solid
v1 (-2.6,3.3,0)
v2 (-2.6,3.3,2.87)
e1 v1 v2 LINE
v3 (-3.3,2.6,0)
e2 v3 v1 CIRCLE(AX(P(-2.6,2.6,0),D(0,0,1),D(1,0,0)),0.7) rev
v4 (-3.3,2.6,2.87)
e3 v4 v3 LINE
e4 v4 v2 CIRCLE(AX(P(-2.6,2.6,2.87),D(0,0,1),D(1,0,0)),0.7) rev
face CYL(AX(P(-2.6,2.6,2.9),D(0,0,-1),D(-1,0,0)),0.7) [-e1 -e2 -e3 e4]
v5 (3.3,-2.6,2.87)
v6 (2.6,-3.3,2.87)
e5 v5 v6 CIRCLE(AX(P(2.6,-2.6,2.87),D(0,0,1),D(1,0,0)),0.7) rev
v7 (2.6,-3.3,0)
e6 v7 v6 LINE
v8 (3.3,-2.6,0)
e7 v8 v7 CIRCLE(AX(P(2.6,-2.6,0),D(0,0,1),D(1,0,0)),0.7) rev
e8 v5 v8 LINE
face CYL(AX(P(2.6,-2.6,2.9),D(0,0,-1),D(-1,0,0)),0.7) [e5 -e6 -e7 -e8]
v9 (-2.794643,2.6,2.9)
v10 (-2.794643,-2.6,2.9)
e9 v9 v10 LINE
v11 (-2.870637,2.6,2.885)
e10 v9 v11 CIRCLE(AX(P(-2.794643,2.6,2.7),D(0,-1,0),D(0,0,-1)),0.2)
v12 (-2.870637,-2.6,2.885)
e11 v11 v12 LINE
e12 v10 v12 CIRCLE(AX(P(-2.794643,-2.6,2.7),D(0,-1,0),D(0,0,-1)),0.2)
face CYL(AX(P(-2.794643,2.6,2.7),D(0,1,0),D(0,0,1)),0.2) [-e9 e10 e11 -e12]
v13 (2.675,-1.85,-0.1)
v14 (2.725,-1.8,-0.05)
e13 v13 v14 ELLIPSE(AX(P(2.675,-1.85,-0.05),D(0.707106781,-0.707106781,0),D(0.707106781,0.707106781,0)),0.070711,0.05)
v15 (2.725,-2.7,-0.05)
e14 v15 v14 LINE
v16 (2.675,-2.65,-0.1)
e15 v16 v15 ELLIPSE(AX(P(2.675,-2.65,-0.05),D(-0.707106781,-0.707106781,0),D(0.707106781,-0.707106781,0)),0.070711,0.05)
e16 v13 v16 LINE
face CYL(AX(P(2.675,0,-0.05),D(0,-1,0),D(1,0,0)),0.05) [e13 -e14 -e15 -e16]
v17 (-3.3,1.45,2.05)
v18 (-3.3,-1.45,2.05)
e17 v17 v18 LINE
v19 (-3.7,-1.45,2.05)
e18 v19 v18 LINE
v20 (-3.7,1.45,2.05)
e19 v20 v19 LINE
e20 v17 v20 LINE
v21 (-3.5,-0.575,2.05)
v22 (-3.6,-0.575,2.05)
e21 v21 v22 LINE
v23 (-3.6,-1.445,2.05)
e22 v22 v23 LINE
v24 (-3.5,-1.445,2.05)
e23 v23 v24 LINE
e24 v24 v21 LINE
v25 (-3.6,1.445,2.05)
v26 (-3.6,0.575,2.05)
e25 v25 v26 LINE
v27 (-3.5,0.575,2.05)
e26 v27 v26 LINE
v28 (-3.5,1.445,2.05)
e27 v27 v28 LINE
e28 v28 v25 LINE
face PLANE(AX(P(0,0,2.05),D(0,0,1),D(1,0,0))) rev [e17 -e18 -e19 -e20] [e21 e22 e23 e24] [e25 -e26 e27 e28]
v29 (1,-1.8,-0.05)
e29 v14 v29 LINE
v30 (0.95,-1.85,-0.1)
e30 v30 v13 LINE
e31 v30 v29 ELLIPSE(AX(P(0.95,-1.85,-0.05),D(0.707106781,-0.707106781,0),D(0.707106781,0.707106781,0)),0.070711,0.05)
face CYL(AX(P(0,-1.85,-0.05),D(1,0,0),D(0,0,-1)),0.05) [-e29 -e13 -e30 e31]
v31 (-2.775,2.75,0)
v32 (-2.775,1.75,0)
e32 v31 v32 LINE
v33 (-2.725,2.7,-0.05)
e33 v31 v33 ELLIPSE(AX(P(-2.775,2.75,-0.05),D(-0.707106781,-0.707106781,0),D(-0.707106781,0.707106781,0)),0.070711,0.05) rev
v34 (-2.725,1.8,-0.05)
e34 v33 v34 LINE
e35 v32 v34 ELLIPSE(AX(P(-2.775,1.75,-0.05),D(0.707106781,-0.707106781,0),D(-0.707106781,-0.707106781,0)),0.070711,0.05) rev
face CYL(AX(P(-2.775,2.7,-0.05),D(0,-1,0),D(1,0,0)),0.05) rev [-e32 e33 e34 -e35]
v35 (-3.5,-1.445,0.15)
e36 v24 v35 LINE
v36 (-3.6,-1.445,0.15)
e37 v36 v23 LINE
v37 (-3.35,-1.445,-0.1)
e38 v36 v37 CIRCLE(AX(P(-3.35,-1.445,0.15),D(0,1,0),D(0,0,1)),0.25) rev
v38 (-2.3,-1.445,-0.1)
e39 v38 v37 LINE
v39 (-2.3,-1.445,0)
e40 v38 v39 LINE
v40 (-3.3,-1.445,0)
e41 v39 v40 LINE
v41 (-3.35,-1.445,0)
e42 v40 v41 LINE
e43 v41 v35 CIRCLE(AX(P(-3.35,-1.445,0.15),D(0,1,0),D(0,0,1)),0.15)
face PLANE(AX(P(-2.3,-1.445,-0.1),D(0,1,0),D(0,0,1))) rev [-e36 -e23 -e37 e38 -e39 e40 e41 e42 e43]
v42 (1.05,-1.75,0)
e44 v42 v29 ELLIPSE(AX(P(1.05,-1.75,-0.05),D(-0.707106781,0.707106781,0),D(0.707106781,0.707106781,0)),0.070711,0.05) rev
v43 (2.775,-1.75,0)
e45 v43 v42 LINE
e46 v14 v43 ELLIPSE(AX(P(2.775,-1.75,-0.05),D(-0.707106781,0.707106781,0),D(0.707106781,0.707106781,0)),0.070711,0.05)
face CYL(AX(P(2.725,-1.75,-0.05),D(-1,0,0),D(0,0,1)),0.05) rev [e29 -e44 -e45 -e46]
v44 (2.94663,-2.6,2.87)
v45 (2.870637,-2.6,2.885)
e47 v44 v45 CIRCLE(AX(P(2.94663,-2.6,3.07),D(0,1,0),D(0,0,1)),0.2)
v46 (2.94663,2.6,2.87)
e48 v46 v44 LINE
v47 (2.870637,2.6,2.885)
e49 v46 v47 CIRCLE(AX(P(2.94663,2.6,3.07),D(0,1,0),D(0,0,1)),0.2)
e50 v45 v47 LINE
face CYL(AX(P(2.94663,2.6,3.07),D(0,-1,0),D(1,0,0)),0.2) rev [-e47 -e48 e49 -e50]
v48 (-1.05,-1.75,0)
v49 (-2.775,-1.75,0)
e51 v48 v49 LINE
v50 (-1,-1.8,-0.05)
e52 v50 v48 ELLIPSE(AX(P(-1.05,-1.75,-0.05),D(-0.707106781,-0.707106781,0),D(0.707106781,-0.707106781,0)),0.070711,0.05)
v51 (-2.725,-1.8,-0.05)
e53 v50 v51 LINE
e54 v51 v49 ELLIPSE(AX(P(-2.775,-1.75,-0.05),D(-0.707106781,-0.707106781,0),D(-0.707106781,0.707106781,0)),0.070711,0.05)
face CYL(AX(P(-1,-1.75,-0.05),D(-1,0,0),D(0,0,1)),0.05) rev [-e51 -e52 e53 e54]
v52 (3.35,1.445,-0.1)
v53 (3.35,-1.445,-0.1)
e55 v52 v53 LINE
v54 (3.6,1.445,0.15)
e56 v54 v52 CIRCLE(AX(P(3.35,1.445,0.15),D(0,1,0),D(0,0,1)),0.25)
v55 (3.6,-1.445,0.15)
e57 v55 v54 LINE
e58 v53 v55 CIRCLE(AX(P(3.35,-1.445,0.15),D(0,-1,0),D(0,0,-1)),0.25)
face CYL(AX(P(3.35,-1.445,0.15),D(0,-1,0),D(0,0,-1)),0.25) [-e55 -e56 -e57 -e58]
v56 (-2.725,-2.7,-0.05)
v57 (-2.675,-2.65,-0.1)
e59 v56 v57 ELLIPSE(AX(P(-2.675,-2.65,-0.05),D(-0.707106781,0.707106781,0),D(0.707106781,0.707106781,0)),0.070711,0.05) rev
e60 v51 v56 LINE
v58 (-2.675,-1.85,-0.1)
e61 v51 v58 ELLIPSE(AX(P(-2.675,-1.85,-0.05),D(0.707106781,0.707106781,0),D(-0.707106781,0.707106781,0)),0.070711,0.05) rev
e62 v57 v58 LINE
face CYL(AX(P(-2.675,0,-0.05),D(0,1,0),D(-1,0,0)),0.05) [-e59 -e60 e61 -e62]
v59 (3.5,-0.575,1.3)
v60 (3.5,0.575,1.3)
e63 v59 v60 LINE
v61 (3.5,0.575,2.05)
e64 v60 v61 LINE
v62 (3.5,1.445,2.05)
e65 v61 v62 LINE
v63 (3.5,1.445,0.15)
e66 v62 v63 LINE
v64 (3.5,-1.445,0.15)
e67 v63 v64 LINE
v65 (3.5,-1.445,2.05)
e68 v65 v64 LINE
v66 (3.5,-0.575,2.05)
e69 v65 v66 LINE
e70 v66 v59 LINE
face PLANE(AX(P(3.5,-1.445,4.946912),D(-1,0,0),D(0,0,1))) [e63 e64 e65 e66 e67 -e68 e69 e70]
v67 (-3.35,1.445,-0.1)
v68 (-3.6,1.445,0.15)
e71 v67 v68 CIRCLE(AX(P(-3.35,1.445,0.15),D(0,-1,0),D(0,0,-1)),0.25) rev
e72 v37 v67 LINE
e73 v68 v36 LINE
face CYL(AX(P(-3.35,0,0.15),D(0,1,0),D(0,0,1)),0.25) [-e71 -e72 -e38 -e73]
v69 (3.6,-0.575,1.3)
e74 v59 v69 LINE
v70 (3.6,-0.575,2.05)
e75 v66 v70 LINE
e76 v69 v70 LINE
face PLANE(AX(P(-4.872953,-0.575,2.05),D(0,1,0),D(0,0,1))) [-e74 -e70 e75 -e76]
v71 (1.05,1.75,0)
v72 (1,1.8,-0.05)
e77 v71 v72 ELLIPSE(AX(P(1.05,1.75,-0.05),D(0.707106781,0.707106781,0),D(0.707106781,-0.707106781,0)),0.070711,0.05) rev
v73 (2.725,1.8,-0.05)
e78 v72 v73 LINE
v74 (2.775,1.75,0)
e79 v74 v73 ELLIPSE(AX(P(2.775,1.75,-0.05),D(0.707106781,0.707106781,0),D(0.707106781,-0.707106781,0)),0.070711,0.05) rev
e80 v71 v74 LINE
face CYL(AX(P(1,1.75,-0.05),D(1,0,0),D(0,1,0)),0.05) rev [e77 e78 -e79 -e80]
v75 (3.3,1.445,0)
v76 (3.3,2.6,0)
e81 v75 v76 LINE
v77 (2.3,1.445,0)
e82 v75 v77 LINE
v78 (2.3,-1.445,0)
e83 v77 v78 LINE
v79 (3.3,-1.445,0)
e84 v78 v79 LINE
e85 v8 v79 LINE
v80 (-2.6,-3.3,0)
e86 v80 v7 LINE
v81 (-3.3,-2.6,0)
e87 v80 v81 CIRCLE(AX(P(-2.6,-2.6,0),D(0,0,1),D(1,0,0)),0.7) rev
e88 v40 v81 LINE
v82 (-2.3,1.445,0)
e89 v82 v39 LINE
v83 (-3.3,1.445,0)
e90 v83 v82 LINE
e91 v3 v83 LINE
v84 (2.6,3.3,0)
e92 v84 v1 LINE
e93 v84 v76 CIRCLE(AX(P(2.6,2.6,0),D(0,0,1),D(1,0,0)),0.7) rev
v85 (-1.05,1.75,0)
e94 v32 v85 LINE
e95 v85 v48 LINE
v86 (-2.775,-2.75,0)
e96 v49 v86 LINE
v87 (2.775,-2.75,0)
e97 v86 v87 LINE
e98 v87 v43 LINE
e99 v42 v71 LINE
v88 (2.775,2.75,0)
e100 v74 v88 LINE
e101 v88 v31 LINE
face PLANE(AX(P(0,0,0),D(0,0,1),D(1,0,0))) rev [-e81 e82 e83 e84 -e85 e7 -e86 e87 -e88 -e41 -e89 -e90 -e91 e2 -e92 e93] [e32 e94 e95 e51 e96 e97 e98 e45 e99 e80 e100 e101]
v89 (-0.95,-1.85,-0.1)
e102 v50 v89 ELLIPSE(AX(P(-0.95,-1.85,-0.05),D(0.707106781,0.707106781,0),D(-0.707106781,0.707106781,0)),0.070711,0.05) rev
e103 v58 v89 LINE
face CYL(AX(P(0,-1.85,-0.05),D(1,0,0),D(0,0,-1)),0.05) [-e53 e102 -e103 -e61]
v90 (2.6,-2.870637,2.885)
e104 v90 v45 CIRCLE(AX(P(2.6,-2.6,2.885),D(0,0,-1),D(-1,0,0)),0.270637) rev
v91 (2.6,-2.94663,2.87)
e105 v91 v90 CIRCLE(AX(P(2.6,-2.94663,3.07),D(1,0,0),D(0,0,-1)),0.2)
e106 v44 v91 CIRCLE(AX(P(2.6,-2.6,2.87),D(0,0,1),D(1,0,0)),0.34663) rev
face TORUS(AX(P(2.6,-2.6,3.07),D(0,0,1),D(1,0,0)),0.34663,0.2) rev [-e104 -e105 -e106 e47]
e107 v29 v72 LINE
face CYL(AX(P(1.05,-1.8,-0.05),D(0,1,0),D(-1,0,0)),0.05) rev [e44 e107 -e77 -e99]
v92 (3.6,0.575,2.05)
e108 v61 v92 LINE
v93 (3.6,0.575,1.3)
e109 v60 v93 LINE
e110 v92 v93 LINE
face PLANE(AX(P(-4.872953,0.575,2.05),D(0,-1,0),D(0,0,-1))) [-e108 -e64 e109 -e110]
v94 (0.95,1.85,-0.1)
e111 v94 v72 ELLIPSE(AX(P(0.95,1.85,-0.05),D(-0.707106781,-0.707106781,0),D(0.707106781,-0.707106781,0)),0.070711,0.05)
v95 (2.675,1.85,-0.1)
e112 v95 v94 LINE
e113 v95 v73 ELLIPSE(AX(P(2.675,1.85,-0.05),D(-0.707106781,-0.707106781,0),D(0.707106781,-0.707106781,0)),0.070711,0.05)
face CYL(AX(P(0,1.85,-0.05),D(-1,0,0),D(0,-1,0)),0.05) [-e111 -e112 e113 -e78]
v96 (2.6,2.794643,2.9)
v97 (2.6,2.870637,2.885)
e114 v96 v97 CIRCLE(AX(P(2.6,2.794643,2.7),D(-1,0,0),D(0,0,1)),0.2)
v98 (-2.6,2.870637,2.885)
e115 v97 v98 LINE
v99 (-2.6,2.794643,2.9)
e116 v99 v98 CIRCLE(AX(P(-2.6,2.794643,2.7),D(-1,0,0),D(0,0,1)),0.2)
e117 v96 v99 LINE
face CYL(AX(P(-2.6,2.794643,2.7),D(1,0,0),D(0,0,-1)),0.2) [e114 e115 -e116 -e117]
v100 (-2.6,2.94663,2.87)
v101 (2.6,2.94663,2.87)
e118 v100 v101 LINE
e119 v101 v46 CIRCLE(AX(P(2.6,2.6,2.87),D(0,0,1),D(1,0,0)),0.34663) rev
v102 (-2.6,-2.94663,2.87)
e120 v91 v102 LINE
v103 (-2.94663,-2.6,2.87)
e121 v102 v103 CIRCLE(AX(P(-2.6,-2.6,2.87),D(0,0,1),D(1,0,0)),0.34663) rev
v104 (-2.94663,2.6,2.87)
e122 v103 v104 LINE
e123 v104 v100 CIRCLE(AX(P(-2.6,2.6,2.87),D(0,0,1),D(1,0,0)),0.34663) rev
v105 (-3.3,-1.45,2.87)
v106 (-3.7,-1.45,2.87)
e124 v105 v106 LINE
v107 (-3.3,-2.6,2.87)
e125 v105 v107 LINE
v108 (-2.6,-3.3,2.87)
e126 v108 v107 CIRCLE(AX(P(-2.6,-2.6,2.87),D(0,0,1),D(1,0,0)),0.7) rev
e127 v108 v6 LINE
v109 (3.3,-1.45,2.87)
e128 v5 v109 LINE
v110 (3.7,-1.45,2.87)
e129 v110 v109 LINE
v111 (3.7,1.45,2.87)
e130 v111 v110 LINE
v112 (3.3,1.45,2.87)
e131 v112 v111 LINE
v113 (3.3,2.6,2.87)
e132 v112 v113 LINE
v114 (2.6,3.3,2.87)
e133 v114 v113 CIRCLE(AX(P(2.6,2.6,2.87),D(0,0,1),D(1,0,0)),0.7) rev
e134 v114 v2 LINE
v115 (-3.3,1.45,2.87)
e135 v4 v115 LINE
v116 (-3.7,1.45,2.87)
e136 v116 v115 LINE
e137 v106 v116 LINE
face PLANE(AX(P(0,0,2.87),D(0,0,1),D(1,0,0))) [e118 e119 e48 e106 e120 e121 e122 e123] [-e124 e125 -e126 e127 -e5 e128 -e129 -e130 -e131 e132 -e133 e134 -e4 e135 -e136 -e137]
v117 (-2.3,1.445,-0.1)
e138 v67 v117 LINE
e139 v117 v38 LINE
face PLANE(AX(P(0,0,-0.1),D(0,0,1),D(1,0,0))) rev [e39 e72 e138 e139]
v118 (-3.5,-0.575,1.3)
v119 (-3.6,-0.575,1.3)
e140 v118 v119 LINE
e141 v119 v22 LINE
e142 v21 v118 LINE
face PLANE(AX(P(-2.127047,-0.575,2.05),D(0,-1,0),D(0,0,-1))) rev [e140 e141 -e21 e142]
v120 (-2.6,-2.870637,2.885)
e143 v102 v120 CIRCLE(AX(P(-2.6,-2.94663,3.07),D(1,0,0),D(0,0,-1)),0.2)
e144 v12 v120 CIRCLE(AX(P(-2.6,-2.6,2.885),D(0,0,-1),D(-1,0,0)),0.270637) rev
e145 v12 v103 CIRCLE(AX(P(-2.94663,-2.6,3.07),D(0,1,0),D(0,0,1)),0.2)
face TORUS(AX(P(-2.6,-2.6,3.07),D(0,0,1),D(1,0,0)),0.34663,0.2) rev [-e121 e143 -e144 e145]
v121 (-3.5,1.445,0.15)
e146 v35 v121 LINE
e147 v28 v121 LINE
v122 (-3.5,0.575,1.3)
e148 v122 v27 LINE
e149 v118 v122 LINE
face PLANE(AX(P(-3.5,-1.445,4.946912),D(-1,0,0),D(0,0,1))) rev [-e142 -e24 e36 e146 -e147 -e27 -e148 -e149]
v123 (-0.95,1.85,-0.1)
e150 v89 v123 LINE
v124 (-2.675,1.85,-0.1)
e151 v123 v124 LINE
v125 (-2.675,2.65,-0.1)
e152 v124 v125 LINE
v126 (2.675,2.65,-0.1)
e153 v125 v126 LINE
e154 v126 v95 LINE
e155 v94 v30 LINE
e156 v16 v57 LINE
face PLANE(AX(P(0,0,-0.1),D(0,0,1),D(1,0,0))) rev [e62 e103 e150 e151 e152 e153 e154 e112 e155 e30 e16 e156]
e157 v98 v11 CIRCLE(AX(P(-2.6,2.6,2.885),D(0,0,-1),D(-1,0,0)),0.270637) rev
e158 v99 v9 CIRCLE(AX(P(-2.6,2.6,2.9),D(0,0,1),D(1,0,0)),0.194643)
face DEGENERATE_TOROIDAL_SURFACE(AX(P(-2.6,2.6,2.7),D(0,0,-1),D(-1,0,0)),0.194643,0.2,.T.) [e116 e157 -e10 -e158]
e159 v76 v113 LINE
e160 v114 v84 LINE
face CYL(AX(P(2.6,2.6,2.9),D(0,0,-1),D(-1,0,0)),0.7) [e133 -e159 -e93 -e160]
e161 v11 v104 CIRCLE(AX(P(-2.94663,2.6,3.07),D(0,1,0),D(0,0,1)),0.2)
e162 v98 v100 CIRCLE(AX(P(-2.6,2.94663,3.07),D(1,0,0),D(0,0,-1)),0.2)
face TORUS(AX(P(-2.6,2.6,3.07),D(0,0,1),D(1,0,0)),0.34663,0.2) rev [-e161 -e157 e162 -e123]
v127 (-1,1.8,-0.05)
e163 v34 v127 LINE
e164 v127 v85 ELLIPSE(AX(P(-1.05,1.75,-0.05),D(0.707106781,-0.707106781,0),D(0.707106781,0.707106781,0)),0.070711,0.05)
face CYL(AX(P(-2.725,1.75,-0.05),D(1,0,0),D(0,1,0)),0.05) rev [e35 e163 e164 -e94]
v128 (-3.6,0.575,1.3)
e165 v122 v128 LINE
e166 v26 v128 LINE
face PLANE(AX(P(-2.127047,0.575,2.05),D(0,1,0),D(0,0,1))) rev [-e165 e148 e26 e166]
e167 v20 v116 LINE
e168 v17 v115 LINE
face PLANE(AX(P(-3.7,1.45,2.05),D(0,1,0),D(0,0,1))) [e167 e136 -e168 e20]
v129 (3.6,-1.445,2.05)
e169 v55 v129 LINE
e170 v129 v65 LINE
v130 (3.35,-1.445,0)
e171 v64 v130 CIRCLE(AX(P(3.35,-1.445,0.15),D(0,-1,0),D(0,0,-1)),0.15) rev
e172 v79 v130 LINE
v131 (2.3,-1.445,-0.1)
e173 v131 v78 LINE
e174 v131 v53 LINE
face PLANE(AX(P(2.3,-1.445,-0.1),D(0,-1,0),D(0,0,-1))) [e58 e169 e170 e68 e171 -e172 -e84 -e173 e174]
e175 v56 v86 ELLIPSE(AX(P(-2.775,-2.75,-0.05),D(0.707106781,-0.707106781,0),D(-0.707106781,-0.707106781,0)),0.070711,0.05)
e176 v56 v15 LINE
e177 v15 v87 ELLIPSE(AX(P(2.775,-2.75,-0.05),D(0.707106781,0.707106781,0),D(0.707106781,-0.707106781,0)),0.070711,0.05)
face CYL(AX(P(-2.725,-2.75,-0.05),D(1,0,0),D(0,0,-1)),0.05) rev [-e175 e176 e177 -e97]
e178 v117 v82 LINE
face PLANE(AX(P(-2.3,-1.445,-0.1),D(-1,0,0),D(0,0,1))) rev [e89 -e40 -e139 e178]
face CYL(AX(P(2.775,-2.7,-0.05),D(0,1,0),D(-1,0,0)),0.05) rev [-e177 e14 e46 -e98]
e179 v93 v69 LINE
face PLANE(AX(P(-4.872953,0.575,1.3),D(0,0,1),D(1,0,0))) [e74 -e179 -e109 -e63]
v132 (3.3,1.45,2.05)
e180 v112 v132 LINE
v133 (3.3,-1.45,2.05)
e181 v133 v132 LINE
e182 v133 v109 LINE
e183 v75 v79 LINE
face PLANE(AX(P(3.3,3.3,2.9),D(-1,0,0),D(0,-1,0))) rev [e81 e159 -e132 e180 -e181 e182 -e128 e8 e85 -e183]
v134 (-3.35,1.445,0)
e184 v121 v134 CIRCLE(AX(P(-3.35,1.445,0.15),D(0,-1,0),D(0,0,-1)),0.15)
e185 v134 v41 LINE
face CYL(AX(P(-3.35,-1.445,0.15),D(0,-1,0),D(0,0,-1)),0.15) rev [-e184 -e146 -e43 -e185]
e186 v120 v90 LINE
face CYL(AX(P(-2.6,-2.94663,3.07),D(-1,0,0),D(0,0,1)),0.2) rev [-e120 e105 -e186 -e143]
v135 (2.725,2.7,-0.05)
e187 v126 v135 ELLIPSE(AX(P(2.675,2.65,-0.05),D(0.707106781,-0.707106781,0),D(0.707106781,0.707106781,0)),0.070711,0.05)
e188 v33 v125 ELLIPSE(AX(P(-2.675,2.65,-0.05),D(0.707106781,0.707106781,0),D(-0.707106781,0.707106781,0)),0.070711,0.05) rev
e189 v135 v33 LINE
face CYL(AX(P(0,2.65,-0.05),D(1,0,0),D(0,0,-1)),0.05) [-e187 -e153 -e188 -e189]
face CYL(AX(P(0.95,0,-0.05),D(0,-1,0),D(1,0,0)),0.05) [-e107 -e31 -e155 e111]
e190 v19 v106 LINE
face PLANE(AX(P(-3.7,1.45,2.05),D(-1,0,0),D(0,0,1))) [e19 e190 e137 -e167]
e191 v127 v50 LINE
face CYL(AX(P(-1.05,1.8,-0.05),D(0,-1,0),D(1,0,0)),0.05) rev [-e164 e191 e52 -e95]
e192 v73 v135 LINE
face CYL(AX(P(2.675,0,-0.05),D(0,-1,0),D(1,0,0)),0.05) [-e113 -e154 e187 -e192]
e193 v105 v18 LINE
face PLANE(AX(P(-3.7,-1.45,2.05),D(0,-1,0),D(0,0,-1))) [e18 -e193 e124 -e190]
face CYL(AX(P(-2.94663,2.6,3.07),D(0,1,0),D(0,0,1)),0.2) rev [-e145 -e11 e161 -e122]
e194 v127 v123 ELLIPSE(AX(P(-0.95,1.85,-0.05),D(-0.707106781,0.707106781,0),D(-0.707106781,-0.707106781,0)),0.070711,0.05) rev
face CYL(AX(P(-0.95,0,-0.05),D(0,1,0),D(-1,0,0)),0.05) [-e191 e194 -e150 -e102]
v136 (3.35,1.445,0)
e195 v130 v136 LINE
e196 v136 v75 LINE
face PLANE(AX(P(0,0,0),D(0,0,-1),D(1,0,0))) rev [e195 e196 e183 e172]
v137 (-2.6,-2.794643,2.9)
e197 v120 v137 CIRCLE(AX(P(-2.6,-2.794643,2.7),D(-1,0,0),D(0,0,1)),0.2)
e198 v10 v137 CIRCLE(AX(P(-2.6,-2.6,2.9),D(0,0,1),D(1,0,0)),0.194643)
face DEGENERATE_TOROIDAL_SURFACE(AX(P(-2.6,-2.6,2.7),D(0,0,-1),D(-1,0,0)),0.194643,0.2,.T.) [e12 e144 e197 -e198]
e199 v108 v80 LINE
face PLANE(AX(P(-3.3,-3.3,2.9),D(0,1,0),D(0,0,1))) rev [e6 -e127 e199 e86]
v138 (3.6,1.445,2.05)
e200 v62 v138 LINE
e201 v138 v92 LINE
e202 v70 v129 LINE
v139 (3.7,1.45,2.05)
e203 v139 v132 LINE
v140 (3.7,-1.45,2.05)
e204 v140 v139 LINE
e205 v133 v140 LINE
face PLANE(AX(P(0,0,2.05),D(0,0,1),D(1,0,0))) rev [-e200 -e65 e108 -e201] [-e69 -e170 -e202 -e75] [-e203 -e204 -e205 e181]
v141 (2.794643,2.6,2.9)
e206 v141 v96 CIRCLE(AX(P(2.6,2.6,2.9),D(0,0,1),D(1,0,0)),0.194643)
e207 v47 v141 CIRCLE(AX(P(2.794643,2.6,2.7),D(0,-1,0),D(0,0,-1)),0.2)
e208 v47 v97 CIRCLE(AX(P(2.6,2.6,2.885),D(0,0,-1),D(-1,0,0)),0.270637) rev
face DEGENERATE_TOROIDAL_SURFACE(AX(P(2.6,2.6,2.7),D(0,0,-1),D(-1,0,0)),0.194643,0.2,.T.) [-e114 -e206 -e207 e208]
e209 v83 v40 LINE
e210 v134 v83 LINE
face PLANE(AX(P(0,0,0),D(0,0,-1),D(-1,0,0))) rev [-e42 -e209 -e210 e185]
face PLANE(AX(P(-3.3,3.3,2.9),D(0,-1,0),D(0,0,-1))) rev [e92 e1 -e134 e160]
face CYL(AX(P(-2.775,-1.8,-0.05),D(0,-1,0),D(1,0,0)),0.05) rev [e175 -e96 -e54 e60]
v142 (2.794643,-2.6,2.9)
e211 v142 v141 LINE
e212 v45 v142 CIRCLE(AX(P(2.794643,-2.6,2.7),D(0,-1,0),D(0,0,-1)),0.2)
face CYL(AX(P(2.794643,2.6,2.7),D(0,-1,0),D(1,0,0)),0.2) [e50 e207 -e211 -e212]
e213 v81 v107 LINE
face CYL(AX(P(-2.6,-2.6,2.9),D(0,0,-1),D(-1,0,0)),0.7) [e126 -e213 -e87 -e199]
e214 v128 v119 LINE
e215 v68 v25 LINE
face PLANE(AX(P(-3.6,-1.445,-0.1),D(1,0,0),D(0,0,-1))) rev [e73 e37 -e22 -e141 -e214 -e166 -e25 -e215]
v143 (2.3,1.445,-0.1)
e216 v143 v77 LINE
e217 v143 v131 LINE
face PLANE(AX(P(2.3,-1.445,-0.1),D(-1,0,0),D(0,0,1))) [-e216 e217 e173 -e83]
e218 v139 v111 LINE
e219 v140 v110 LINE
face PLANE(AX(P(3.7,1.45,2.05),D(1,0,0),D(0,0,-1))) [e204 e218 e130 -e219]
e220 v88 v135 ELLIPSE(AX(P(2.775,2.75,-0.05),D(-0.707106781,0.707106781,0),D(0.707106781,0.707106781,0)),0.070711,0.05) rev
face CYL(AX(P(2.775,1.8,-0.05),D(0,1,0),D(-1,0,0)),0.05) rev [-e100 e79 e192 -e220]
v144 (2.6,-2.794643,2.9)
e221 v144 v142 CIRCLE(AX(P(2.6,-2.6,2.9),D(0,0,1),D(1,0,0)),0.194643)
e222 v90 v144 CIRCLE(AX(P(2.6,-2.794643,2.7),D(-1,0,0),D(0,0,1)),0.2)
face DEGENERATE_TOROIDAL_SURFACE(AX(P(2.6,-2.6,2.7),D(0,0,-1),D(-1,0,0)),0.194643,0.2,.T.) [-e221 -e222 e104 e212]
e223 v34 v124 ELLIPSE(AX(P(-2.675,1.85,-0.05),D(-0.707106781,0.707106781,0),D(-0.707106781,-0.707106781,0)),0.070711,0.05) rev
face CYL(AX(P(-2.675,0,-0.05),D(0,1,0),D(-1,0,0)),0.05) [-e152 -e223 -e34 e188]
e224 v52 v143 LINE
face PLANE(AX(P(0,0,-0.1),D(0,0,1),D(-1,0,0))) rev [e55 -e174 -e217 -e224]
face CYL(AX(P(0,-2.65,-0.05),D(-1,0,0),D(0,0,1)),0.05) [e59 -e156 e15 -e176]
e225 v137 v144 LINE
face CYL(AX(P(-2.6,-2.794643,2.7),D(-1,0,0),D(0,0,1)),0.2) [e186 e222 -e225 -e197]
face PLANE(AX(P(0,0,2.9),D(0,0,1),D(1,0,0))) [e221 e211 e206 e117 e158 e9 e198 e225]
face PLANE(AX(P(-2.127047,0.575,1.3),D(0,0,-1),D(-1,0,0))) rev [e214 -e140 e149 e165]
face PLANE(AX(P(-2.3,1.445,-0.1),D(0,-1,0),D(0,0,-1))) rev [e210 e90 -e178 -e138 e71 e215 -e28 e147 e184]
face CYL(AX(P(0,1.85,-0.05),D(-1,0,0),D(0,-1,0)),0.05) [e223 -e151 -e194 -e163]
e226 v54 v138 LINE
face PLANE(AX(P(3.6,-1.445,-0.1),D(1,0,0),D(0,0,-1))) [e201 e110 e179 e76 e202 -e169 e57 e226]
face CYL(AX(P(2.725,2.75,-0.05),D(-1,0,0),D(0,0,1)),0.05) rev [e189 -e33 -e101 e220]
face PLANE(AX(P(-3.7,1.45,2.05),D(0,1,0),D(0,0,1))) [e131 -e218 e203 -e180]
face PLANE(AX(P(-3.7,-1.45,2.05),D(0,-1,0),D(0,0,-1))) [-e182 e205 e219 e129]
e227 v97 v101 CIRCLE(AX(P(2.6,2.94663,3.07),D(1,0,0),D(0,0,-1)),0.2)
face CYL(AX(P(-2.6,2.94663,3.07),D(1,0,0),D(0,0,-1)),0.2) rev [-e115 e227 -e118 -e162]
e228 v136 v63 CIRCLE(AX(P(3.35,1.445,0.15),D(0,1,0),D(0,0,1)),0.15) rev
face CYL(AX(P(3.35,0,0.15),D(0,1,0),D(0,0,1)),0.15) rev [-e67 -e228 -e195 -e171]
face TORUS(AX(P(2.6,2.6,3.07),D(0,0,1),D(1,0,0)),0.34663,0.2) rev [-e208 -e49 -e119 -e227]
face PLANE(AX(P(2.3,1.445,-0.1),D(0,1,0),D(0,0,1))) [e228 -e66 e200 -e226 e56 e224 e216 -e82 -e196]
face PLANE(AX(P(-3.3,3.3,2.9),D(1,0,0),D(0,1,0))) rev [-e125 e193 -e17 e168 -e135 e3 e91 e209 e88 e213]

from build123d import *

# Parameters (mm, degrees)
SKETCH1_W            = 6.6
SKETCH1_H            = 6.6
BOSS_EXTRUDE1_DEPTH  = 2.9
SKETCH6_W            = 7.4
SKETCH6_H            = 2.9
BOSS_EXTRUDE5_DEPTH  = 0.85
FILLET1_R            = 0.7
SKETCH2_W            = 0.9
SKETCH2_H            = 2.1
CUT_EXTRUDE1_DEPTH   = 0.05
SKETCH3_W            = 1.3
SKETCH3_H            = 2.89
BOSS_EXTRUDE2_DEPTH  = 0.15
SKETCH4_W            = 0.3
SKETCH4_H            = 2.89
BOSS_EXTRUDE3_DEPTH  = 2
FILLET2_R            = 0.25
BOSS_EXTRUDE4_DEPTH  = 0.1
FILLET3_R            = 0.05
FILLET4_R            = 0.05
SKETCH8_W            = 0.2
SKETCH8_H            = 2.89
CUT_EXTRUDE2_DEPTH   = 2.05
FILLET5_R            = 0.15
SKETCH9_W            = 0.75
SKETCH9_H            = 1.15
CUT_EXTRUDE3_DEPTH   = 0.1
FILLET2_OF_MIRROR2_R = 0.25
FILLET5_OF_MIRROR2_R = 0.15
SKETCH10_W           = 10
SKETCH10_H           = 10
CUT_EXTRUDE4_DEPTH   = 0.03
FILLET6_R            = 0.2
FILLET7_R            = 0.2


# Some blends are built 0.0001 mm under size
with BuildPart() as part:
    # Sketch1 → Boss-Extrude1 (new body)
    with BuildSketch(Plane.XY):
        Rectangle(SKETCH1_W, SKETCH1_H)
    extrude(amount=BOSS_EXTRUDE1_DEPTH)

    # Sketch6 → Boss-Extrude5 (add)
    with BuildSketch(Plane.XY.offset(2.9)):
        Rectangle(SKETCH6_W, SKETCH6_H)
    extrude(amount=-BOSS_EXTRUDE5_DEPTH)

    # Fillet1
    fillet1_edges = [part.edges().sort_by_distance(p)[0] for p in [
        (3.3, -3.3, 1.45),
        (-3.3, -3.3, 1.45),
        (-3.3, 3.3, 1.45),
        (3.3, 3.3, 1.45),
    ]]
    fillet(fillet1_edges, radius=FILLET1_R)

    # Sketch2 → Cut-Extrude1 (cut)
    with BuildSketch(Plane(origin=(0, 0, 0), x_dir=(-1, 0, 0), z_dir=(0, 0, -1))):
        with Locations((2.85, 0)):
            Rectangle(SKETCH2_W, SKETCH2_H)
        with Locations((-2.85, 0)):
            Rectangle(SKETCH2_W, SKETCH2_H)
    extrude(amount=-CUT_EXTRUDE1_DEPTH, mode=Mode.SUBTRACT)

    # Sketch3 → Boss-Extrude2 (add)
    with BuildSketch(Plane(origin=(0, 0, 0.05), x_dir=(-1, 0, 0), z_dir=(0, 0, -1))):
        with Locations((2.95, 0)):
            Rectangle(SKETCH3_W, SKETCH3_H)
    boss_extrude2 = extrude(amount=BOSS_EXTRUDE2_DEPTH)

    # Sketch4 → Boss-Extrude3 (add)
    with BuildSketch(Plane.XY.offset(0.05)):
        with Locations((-3.45, 0)):
            Rectangle(SKETCH4_W, SKETCH4_H)
    boss_extrude3 = extrude(amount=BOSS_EXTRUDE3_DEPTH)

    # Fillet2
    fillet2_edges = [part.edges().sort_by_distance(p)[0] for p in [
        (-3.6, 0, -0.1),
    ]]
    fillet(fillet2_edges, radius=FILLET2_R)

    # Sketch5 → Boss-Extrude4 (add)
    with BuildSketch(Plane(origin=(0, 0, 0), x_dir=(-1, 0, 0), z_dir=(0, 0, -1))):
        Polygon((2.725, -2.7), (-2.725, -2.7), (-2.725, -1.8), (-1, -1.8), (-1, 1.8), (-2.725, 1.8), (-2.725, 2.7), (2.725, 2.7), (2.725, 1.8), (1, 1.8), (1, -1.8), (2.725, -1.8), align=None)
    extrude(amount=BOSS_EXTRUDE4_DEPTH)

    # Fillet3
    fillet3_edges = [part.edges().sort_by_distance(p)[0] for p in [
        (-2.725, -2.25, -0.1),
        (-1.8625, -1.8, -0.1),
        (-1, 0, -0.1),
        (-1.8625, 1.8, -0.1),
        (-2.725, 2.25, -0.1),
        (0, 2.7, -0.1),
        (2.725, 2.25, -0.1),
        (1.8625, 1.8, -0.1),
        (1, 0, -0.1),
        (1.8625, -1.8, -0.1),
        (2.725, -2.25, -0.1),
        (0, -2.7, -0.1),
    ]]
    fillet(fillet3_edges, radius=FILLET3_R)

    # Fillet4
    fillet4_edges = [part.edges().sort_by_distance(p)[0] for p in [
        (-1.8625, 1.8, 0),
        (-2.725, 2.25, 0),
        (0, 2.7, 0),
        (2.725, 2.25, 0),
        (1.8625, 1.8, 0),
        (1, 0, 0),
        (1.8625, -1.8, 0),
        (2.725, -2.25, 0),
        (0, -2.7, 0),
        (-1, 0, 0),
        (-2.725, -2.25, 0),
        (-1.8625, -1.8, 0),
    ]]
    fillet(fillet4_edges, radius=FILLET4_R - 0.0001)  # a hair under: the kernel refuses the full size

    # Sketch8 → Cut-Extrude2 (cut)
    with BuildSketch(Plane(origin=(0, 0, 0), x_dir=(-1, 0, 0), z_dir=(0, 0, -1))):
        with Locations((3.4, 0)):
            Rectangle(SKETCH8_W, SKETCH8_H)
    cut_extrude2 = extrude(amount=-CUT_EXTRUDE2_DEPTH, mode=Mode.SUBTRACT)

    # Fillet5
    fillet5_edges = [part.edges().sort_by_distance(p)[0] for p in [
        (-3.5, 0, 0),
    ]]
    fillet(fillet5_edges, radius=FILLET5_R)

    # Sketch9 → Cut-Extrude3 (cut)
    with BuildSketch(Plane.ZY.offset(3.6)):
        with Locations((1.675, 0)):
            Rectangle(SKETCH9_W, SKETCH9_H)
    cut_extrude3 = extrude(amount=-CUT_EXTRUDE3_DEPTH, mode=Mode.SUBTRACT)

    # Mirror2: Boss-Extrude2, Boss-Extrude3, Cut-Extrude2, Cut-Extrude3 across plane
    add(boss_extrude2.mirror(Plane(origin=(0, 0, 0), x_dir=(0, 0, 1), z_dir=(1, 0, 0))))
    add(boss_extrude3.mirror(Plane(origin=(0, 0, 0), x_dir=(0, 0, 1), z_dir=(1, 0, 0))))
    add(cut_extrude2.mirror(Plane(origin=(0, 0, 0), x_dir=(0, 0, 1), z_dir=(1, 0, 0))), mode=Mode.SUBTRACT)
    add(cut_extrude3.mirror(Plane(origin=(0, 0, 0), x_dir=(0, 0, 1), z_dir=(1, 0, 0))), mode=Mode.SUBTRACT)

    # Fillet2 of Mirror2
    fillet2_of_mirror2_edges = [part.edges().sort_by_distance(p)[0] for p in [
        (3.6, 0, -0.1),
    ]]
    fillet(fillet2_of_mirror2_edges, radius=FILLET2_OF_MIRROR2_R)

    # Fillet5 of Mirror2
    fillet5_of_mirror2_edges = [part.edges().sort_by_distance(p)[0] for p in [
        (3.5, 0, 0),
    ]]
    fillet(fillet5_of_mirror2_edges, radius=FILLET5_OF_MIRROR2_R)

    # Sketch10 → Cut-Extrude4 (cut)
    with BuildSketch(Plane.XY.offset(2.9)):
        with Locations((0.5029938, 0.413168945)):
            Rectangle(SKETCH10_W, SKETCH10_H)
        with BuildLine():
            Line((-2.6, 2.9), (2.6, 2.9))
            ThreePointArc((2.6, 2.9), (2.812132034, 2.812132034), (2.9, 2.6))
            Line((2.9, 2.6), (2.9, -2.6))
            ThreePointArc((2.9, -2.6), (2.812132034, -2.812132034), (2.6, -2.9))
            Line((2.6, -2.9), (-2.6, -2.9))
            ThreePointArc((-2.6, -2.9), (-2.812132034, -2.812132034), (-2.9, -2.6))
            Line((-2.9, -2.6), (-2.9, 2.6))
            ThreePointArc((-2.9, 2.6), (-2.812132034, 2.812132034), (-2.6, 2.9))
        make_face(mode=Mode.SUBTRACT)
    extrude(amount=-CUT_EXTRUDE4_DEPTH, mode=Mode.SUBTRACT)

    # Fillet6
    # the kernel refuses this fillet: 0.2 mm, written as the material it takes off along each edge
    with BuildSketch(Plane(origin=(-2.6, -2.6, 2.9), x_dir=(0, -1, 0), z_dir=(1, 0, 0))) as fillet6_piece_1:
        with BuildLine():
            CenterArc((0.194643462, 0.2), FILLET6_R, 270, 31.788330618)
            Line((0.194643462, 0), (0.194643462, -0.004))
            Line((0.194643462, -0.004), (0.3, -0.004))
            Line((0.3, -0.004), (0.304, 0))
            ThreePointArc((0.304, 0), (0.304, 0.015), (0.302107131, 0.0266))
            Line((0.302107131, 0.0266), (0.3, 0.03))
        make_face()
    revolve(axis=Axis((-2.6, -2.6, 2.9), (0, 0, -1)), revolution_arc=90, mode=Mode.SUBTRACT)
    with BuildSketch(Plane(origin=(-2.9, -2.6, 2.9), x_dir=(1.837049031358635e-11, 0, -1.0), z_dir=(0, 1, 0)), Plane(origin=(-2.6, 2.9, 2.9), x_dir=(0, -1.837049031358635e-11, -1.0), z_dir=(1, 0, 0)), Plane(origin=(2.9, 2.6, 2.9), x_dir=(-1.837049031358635e-11, 0, -1.0), z_dir=(0, -1, 0)), Plane(origin=(2.6, -2.9, 2.9), x_dir=(0, 1.837049031358635e-11, -1.0), z_dir=(-1, 0, 0))) as fillet6_piece_2:
        with BuildLine():
            CenterArc((0.2, -0.105356538), FILLET6_R, 148.211669384, 31.788330618)
            Line((0, -0.105356538), (-0.004, -0.105356538))
            Line((-0.004, -0.105356538), (-0.004, 0))
            Line((-0.004, 0), (0, 0.004))
            ThreePointArc((0, 0.004), (0.015, 0.004), (0.0266, 0.002107131))
            Line((0.0266, 0.002107131), (0.03, 0))
        make_face()
    extrude(amount=5.2, mode=Mode.SUBTRACT)
    with BuildSketch(Plane(origin=(-2.6, 2.6, 2.9), x_dir=(-1, 0, 0), z_dir=(0, -1, 0))) as fillet6_piece_3:
        with BuildLine():
            CenterArc((0.194643462, 0.2), FILLET6_R, 270, 31.788330618)
            Line((0.194643462, 0), (0.194643462, -0.004))
            Line((0.194643462, -0.004), (0.3, -0.004))
            Line((0.3, -0.004), (0.304, 0))
            ThreePointArc((0.304, 0), (0.304, 0.015), (0.302107131, 0.0266))
            Line((0.302107131, 0.0266), (0.3, 0.03))
        make_face()
    revolve(axis=Axis((-2.6, 2.6, 2.9), (0, 0, -1)), revolution_arc=90, mode=Mode.SUBTRACT)
    with BuildSketch(Plane(origin=(2.6, 2.6, 2.9), x_dir=(0, 1, 0), z_dir=(-1, 0, 0))) as fillet6_piece_4:
        with BuildLine():
            CenterArc((0.194643462, 0.2), FILLET6_R, 270, 31.788330618)
            Line((0.194643462, 0), (0.194643462, -0.004))
            Line((0.194643462, -0.004), (0.3, -0.004))
            Line((0.3, -0.004), (0.304, 0))
            ThreePointArc((0.304, 0), (0.304, 0.015), (0.302107131, 0.0266))
            Line((0.302107131, 0.0266), (0.3, 0.03))
        make_face()
    revolve(axis=Axis((2.6, 2.6, 2.9), (0, 0, -1)), revolution_arc=90, mode=Mode.SUBTRACT)
    with BuildSketch(Plane(origin=(2.6, -2.6, 2.9), x_dir=(1, 0, 0), z_dir=(0, 1, 0))) as fillet6_piece_5:
        with BuildLine():
            CenterArc((0.194643462, 0.2), FILLET6_R, 270, 31.788330618)
            Line((0.194643462, 0), (0.194643462, -0.004))
            Line((0.194643462, -0.004), (0.3, -0.004))
            Line((0.3, -0.004), (0.304, 0))
            ThreePointArc((0.304, 0), (0.304, 0.015), (0.302107131, 0.0266))
            Line((0.302107131, 0.0266), (0.3, 0.03))
        make_face()
    revolve(axis=Axis((2.6, -2.6, 2.9), (0, 0, -1)), revolution_arc=90, mode=Mode.SUBTRACT)

    # Fillet7
    fillet7_edges = [part.edges().sort_by_distance(p)[0] for p in [
        (0, 2.9, 2.87),
        (-2.812132034, 2.812132034, 2.87),
        (-2.9, 0, 2.87),
        (-2.812132034, -2.812132034, 2.87),
        (0, -2.9, 2.87),
        (2.812132034, -2.812132034, 2.87),
        (2.9, 0, 2.87),
        (2.812132034, 2.812132034, 2.87),
    ]]
    fillet(fillet7_edges, radius=FILLET7_R)


solid = part.part
